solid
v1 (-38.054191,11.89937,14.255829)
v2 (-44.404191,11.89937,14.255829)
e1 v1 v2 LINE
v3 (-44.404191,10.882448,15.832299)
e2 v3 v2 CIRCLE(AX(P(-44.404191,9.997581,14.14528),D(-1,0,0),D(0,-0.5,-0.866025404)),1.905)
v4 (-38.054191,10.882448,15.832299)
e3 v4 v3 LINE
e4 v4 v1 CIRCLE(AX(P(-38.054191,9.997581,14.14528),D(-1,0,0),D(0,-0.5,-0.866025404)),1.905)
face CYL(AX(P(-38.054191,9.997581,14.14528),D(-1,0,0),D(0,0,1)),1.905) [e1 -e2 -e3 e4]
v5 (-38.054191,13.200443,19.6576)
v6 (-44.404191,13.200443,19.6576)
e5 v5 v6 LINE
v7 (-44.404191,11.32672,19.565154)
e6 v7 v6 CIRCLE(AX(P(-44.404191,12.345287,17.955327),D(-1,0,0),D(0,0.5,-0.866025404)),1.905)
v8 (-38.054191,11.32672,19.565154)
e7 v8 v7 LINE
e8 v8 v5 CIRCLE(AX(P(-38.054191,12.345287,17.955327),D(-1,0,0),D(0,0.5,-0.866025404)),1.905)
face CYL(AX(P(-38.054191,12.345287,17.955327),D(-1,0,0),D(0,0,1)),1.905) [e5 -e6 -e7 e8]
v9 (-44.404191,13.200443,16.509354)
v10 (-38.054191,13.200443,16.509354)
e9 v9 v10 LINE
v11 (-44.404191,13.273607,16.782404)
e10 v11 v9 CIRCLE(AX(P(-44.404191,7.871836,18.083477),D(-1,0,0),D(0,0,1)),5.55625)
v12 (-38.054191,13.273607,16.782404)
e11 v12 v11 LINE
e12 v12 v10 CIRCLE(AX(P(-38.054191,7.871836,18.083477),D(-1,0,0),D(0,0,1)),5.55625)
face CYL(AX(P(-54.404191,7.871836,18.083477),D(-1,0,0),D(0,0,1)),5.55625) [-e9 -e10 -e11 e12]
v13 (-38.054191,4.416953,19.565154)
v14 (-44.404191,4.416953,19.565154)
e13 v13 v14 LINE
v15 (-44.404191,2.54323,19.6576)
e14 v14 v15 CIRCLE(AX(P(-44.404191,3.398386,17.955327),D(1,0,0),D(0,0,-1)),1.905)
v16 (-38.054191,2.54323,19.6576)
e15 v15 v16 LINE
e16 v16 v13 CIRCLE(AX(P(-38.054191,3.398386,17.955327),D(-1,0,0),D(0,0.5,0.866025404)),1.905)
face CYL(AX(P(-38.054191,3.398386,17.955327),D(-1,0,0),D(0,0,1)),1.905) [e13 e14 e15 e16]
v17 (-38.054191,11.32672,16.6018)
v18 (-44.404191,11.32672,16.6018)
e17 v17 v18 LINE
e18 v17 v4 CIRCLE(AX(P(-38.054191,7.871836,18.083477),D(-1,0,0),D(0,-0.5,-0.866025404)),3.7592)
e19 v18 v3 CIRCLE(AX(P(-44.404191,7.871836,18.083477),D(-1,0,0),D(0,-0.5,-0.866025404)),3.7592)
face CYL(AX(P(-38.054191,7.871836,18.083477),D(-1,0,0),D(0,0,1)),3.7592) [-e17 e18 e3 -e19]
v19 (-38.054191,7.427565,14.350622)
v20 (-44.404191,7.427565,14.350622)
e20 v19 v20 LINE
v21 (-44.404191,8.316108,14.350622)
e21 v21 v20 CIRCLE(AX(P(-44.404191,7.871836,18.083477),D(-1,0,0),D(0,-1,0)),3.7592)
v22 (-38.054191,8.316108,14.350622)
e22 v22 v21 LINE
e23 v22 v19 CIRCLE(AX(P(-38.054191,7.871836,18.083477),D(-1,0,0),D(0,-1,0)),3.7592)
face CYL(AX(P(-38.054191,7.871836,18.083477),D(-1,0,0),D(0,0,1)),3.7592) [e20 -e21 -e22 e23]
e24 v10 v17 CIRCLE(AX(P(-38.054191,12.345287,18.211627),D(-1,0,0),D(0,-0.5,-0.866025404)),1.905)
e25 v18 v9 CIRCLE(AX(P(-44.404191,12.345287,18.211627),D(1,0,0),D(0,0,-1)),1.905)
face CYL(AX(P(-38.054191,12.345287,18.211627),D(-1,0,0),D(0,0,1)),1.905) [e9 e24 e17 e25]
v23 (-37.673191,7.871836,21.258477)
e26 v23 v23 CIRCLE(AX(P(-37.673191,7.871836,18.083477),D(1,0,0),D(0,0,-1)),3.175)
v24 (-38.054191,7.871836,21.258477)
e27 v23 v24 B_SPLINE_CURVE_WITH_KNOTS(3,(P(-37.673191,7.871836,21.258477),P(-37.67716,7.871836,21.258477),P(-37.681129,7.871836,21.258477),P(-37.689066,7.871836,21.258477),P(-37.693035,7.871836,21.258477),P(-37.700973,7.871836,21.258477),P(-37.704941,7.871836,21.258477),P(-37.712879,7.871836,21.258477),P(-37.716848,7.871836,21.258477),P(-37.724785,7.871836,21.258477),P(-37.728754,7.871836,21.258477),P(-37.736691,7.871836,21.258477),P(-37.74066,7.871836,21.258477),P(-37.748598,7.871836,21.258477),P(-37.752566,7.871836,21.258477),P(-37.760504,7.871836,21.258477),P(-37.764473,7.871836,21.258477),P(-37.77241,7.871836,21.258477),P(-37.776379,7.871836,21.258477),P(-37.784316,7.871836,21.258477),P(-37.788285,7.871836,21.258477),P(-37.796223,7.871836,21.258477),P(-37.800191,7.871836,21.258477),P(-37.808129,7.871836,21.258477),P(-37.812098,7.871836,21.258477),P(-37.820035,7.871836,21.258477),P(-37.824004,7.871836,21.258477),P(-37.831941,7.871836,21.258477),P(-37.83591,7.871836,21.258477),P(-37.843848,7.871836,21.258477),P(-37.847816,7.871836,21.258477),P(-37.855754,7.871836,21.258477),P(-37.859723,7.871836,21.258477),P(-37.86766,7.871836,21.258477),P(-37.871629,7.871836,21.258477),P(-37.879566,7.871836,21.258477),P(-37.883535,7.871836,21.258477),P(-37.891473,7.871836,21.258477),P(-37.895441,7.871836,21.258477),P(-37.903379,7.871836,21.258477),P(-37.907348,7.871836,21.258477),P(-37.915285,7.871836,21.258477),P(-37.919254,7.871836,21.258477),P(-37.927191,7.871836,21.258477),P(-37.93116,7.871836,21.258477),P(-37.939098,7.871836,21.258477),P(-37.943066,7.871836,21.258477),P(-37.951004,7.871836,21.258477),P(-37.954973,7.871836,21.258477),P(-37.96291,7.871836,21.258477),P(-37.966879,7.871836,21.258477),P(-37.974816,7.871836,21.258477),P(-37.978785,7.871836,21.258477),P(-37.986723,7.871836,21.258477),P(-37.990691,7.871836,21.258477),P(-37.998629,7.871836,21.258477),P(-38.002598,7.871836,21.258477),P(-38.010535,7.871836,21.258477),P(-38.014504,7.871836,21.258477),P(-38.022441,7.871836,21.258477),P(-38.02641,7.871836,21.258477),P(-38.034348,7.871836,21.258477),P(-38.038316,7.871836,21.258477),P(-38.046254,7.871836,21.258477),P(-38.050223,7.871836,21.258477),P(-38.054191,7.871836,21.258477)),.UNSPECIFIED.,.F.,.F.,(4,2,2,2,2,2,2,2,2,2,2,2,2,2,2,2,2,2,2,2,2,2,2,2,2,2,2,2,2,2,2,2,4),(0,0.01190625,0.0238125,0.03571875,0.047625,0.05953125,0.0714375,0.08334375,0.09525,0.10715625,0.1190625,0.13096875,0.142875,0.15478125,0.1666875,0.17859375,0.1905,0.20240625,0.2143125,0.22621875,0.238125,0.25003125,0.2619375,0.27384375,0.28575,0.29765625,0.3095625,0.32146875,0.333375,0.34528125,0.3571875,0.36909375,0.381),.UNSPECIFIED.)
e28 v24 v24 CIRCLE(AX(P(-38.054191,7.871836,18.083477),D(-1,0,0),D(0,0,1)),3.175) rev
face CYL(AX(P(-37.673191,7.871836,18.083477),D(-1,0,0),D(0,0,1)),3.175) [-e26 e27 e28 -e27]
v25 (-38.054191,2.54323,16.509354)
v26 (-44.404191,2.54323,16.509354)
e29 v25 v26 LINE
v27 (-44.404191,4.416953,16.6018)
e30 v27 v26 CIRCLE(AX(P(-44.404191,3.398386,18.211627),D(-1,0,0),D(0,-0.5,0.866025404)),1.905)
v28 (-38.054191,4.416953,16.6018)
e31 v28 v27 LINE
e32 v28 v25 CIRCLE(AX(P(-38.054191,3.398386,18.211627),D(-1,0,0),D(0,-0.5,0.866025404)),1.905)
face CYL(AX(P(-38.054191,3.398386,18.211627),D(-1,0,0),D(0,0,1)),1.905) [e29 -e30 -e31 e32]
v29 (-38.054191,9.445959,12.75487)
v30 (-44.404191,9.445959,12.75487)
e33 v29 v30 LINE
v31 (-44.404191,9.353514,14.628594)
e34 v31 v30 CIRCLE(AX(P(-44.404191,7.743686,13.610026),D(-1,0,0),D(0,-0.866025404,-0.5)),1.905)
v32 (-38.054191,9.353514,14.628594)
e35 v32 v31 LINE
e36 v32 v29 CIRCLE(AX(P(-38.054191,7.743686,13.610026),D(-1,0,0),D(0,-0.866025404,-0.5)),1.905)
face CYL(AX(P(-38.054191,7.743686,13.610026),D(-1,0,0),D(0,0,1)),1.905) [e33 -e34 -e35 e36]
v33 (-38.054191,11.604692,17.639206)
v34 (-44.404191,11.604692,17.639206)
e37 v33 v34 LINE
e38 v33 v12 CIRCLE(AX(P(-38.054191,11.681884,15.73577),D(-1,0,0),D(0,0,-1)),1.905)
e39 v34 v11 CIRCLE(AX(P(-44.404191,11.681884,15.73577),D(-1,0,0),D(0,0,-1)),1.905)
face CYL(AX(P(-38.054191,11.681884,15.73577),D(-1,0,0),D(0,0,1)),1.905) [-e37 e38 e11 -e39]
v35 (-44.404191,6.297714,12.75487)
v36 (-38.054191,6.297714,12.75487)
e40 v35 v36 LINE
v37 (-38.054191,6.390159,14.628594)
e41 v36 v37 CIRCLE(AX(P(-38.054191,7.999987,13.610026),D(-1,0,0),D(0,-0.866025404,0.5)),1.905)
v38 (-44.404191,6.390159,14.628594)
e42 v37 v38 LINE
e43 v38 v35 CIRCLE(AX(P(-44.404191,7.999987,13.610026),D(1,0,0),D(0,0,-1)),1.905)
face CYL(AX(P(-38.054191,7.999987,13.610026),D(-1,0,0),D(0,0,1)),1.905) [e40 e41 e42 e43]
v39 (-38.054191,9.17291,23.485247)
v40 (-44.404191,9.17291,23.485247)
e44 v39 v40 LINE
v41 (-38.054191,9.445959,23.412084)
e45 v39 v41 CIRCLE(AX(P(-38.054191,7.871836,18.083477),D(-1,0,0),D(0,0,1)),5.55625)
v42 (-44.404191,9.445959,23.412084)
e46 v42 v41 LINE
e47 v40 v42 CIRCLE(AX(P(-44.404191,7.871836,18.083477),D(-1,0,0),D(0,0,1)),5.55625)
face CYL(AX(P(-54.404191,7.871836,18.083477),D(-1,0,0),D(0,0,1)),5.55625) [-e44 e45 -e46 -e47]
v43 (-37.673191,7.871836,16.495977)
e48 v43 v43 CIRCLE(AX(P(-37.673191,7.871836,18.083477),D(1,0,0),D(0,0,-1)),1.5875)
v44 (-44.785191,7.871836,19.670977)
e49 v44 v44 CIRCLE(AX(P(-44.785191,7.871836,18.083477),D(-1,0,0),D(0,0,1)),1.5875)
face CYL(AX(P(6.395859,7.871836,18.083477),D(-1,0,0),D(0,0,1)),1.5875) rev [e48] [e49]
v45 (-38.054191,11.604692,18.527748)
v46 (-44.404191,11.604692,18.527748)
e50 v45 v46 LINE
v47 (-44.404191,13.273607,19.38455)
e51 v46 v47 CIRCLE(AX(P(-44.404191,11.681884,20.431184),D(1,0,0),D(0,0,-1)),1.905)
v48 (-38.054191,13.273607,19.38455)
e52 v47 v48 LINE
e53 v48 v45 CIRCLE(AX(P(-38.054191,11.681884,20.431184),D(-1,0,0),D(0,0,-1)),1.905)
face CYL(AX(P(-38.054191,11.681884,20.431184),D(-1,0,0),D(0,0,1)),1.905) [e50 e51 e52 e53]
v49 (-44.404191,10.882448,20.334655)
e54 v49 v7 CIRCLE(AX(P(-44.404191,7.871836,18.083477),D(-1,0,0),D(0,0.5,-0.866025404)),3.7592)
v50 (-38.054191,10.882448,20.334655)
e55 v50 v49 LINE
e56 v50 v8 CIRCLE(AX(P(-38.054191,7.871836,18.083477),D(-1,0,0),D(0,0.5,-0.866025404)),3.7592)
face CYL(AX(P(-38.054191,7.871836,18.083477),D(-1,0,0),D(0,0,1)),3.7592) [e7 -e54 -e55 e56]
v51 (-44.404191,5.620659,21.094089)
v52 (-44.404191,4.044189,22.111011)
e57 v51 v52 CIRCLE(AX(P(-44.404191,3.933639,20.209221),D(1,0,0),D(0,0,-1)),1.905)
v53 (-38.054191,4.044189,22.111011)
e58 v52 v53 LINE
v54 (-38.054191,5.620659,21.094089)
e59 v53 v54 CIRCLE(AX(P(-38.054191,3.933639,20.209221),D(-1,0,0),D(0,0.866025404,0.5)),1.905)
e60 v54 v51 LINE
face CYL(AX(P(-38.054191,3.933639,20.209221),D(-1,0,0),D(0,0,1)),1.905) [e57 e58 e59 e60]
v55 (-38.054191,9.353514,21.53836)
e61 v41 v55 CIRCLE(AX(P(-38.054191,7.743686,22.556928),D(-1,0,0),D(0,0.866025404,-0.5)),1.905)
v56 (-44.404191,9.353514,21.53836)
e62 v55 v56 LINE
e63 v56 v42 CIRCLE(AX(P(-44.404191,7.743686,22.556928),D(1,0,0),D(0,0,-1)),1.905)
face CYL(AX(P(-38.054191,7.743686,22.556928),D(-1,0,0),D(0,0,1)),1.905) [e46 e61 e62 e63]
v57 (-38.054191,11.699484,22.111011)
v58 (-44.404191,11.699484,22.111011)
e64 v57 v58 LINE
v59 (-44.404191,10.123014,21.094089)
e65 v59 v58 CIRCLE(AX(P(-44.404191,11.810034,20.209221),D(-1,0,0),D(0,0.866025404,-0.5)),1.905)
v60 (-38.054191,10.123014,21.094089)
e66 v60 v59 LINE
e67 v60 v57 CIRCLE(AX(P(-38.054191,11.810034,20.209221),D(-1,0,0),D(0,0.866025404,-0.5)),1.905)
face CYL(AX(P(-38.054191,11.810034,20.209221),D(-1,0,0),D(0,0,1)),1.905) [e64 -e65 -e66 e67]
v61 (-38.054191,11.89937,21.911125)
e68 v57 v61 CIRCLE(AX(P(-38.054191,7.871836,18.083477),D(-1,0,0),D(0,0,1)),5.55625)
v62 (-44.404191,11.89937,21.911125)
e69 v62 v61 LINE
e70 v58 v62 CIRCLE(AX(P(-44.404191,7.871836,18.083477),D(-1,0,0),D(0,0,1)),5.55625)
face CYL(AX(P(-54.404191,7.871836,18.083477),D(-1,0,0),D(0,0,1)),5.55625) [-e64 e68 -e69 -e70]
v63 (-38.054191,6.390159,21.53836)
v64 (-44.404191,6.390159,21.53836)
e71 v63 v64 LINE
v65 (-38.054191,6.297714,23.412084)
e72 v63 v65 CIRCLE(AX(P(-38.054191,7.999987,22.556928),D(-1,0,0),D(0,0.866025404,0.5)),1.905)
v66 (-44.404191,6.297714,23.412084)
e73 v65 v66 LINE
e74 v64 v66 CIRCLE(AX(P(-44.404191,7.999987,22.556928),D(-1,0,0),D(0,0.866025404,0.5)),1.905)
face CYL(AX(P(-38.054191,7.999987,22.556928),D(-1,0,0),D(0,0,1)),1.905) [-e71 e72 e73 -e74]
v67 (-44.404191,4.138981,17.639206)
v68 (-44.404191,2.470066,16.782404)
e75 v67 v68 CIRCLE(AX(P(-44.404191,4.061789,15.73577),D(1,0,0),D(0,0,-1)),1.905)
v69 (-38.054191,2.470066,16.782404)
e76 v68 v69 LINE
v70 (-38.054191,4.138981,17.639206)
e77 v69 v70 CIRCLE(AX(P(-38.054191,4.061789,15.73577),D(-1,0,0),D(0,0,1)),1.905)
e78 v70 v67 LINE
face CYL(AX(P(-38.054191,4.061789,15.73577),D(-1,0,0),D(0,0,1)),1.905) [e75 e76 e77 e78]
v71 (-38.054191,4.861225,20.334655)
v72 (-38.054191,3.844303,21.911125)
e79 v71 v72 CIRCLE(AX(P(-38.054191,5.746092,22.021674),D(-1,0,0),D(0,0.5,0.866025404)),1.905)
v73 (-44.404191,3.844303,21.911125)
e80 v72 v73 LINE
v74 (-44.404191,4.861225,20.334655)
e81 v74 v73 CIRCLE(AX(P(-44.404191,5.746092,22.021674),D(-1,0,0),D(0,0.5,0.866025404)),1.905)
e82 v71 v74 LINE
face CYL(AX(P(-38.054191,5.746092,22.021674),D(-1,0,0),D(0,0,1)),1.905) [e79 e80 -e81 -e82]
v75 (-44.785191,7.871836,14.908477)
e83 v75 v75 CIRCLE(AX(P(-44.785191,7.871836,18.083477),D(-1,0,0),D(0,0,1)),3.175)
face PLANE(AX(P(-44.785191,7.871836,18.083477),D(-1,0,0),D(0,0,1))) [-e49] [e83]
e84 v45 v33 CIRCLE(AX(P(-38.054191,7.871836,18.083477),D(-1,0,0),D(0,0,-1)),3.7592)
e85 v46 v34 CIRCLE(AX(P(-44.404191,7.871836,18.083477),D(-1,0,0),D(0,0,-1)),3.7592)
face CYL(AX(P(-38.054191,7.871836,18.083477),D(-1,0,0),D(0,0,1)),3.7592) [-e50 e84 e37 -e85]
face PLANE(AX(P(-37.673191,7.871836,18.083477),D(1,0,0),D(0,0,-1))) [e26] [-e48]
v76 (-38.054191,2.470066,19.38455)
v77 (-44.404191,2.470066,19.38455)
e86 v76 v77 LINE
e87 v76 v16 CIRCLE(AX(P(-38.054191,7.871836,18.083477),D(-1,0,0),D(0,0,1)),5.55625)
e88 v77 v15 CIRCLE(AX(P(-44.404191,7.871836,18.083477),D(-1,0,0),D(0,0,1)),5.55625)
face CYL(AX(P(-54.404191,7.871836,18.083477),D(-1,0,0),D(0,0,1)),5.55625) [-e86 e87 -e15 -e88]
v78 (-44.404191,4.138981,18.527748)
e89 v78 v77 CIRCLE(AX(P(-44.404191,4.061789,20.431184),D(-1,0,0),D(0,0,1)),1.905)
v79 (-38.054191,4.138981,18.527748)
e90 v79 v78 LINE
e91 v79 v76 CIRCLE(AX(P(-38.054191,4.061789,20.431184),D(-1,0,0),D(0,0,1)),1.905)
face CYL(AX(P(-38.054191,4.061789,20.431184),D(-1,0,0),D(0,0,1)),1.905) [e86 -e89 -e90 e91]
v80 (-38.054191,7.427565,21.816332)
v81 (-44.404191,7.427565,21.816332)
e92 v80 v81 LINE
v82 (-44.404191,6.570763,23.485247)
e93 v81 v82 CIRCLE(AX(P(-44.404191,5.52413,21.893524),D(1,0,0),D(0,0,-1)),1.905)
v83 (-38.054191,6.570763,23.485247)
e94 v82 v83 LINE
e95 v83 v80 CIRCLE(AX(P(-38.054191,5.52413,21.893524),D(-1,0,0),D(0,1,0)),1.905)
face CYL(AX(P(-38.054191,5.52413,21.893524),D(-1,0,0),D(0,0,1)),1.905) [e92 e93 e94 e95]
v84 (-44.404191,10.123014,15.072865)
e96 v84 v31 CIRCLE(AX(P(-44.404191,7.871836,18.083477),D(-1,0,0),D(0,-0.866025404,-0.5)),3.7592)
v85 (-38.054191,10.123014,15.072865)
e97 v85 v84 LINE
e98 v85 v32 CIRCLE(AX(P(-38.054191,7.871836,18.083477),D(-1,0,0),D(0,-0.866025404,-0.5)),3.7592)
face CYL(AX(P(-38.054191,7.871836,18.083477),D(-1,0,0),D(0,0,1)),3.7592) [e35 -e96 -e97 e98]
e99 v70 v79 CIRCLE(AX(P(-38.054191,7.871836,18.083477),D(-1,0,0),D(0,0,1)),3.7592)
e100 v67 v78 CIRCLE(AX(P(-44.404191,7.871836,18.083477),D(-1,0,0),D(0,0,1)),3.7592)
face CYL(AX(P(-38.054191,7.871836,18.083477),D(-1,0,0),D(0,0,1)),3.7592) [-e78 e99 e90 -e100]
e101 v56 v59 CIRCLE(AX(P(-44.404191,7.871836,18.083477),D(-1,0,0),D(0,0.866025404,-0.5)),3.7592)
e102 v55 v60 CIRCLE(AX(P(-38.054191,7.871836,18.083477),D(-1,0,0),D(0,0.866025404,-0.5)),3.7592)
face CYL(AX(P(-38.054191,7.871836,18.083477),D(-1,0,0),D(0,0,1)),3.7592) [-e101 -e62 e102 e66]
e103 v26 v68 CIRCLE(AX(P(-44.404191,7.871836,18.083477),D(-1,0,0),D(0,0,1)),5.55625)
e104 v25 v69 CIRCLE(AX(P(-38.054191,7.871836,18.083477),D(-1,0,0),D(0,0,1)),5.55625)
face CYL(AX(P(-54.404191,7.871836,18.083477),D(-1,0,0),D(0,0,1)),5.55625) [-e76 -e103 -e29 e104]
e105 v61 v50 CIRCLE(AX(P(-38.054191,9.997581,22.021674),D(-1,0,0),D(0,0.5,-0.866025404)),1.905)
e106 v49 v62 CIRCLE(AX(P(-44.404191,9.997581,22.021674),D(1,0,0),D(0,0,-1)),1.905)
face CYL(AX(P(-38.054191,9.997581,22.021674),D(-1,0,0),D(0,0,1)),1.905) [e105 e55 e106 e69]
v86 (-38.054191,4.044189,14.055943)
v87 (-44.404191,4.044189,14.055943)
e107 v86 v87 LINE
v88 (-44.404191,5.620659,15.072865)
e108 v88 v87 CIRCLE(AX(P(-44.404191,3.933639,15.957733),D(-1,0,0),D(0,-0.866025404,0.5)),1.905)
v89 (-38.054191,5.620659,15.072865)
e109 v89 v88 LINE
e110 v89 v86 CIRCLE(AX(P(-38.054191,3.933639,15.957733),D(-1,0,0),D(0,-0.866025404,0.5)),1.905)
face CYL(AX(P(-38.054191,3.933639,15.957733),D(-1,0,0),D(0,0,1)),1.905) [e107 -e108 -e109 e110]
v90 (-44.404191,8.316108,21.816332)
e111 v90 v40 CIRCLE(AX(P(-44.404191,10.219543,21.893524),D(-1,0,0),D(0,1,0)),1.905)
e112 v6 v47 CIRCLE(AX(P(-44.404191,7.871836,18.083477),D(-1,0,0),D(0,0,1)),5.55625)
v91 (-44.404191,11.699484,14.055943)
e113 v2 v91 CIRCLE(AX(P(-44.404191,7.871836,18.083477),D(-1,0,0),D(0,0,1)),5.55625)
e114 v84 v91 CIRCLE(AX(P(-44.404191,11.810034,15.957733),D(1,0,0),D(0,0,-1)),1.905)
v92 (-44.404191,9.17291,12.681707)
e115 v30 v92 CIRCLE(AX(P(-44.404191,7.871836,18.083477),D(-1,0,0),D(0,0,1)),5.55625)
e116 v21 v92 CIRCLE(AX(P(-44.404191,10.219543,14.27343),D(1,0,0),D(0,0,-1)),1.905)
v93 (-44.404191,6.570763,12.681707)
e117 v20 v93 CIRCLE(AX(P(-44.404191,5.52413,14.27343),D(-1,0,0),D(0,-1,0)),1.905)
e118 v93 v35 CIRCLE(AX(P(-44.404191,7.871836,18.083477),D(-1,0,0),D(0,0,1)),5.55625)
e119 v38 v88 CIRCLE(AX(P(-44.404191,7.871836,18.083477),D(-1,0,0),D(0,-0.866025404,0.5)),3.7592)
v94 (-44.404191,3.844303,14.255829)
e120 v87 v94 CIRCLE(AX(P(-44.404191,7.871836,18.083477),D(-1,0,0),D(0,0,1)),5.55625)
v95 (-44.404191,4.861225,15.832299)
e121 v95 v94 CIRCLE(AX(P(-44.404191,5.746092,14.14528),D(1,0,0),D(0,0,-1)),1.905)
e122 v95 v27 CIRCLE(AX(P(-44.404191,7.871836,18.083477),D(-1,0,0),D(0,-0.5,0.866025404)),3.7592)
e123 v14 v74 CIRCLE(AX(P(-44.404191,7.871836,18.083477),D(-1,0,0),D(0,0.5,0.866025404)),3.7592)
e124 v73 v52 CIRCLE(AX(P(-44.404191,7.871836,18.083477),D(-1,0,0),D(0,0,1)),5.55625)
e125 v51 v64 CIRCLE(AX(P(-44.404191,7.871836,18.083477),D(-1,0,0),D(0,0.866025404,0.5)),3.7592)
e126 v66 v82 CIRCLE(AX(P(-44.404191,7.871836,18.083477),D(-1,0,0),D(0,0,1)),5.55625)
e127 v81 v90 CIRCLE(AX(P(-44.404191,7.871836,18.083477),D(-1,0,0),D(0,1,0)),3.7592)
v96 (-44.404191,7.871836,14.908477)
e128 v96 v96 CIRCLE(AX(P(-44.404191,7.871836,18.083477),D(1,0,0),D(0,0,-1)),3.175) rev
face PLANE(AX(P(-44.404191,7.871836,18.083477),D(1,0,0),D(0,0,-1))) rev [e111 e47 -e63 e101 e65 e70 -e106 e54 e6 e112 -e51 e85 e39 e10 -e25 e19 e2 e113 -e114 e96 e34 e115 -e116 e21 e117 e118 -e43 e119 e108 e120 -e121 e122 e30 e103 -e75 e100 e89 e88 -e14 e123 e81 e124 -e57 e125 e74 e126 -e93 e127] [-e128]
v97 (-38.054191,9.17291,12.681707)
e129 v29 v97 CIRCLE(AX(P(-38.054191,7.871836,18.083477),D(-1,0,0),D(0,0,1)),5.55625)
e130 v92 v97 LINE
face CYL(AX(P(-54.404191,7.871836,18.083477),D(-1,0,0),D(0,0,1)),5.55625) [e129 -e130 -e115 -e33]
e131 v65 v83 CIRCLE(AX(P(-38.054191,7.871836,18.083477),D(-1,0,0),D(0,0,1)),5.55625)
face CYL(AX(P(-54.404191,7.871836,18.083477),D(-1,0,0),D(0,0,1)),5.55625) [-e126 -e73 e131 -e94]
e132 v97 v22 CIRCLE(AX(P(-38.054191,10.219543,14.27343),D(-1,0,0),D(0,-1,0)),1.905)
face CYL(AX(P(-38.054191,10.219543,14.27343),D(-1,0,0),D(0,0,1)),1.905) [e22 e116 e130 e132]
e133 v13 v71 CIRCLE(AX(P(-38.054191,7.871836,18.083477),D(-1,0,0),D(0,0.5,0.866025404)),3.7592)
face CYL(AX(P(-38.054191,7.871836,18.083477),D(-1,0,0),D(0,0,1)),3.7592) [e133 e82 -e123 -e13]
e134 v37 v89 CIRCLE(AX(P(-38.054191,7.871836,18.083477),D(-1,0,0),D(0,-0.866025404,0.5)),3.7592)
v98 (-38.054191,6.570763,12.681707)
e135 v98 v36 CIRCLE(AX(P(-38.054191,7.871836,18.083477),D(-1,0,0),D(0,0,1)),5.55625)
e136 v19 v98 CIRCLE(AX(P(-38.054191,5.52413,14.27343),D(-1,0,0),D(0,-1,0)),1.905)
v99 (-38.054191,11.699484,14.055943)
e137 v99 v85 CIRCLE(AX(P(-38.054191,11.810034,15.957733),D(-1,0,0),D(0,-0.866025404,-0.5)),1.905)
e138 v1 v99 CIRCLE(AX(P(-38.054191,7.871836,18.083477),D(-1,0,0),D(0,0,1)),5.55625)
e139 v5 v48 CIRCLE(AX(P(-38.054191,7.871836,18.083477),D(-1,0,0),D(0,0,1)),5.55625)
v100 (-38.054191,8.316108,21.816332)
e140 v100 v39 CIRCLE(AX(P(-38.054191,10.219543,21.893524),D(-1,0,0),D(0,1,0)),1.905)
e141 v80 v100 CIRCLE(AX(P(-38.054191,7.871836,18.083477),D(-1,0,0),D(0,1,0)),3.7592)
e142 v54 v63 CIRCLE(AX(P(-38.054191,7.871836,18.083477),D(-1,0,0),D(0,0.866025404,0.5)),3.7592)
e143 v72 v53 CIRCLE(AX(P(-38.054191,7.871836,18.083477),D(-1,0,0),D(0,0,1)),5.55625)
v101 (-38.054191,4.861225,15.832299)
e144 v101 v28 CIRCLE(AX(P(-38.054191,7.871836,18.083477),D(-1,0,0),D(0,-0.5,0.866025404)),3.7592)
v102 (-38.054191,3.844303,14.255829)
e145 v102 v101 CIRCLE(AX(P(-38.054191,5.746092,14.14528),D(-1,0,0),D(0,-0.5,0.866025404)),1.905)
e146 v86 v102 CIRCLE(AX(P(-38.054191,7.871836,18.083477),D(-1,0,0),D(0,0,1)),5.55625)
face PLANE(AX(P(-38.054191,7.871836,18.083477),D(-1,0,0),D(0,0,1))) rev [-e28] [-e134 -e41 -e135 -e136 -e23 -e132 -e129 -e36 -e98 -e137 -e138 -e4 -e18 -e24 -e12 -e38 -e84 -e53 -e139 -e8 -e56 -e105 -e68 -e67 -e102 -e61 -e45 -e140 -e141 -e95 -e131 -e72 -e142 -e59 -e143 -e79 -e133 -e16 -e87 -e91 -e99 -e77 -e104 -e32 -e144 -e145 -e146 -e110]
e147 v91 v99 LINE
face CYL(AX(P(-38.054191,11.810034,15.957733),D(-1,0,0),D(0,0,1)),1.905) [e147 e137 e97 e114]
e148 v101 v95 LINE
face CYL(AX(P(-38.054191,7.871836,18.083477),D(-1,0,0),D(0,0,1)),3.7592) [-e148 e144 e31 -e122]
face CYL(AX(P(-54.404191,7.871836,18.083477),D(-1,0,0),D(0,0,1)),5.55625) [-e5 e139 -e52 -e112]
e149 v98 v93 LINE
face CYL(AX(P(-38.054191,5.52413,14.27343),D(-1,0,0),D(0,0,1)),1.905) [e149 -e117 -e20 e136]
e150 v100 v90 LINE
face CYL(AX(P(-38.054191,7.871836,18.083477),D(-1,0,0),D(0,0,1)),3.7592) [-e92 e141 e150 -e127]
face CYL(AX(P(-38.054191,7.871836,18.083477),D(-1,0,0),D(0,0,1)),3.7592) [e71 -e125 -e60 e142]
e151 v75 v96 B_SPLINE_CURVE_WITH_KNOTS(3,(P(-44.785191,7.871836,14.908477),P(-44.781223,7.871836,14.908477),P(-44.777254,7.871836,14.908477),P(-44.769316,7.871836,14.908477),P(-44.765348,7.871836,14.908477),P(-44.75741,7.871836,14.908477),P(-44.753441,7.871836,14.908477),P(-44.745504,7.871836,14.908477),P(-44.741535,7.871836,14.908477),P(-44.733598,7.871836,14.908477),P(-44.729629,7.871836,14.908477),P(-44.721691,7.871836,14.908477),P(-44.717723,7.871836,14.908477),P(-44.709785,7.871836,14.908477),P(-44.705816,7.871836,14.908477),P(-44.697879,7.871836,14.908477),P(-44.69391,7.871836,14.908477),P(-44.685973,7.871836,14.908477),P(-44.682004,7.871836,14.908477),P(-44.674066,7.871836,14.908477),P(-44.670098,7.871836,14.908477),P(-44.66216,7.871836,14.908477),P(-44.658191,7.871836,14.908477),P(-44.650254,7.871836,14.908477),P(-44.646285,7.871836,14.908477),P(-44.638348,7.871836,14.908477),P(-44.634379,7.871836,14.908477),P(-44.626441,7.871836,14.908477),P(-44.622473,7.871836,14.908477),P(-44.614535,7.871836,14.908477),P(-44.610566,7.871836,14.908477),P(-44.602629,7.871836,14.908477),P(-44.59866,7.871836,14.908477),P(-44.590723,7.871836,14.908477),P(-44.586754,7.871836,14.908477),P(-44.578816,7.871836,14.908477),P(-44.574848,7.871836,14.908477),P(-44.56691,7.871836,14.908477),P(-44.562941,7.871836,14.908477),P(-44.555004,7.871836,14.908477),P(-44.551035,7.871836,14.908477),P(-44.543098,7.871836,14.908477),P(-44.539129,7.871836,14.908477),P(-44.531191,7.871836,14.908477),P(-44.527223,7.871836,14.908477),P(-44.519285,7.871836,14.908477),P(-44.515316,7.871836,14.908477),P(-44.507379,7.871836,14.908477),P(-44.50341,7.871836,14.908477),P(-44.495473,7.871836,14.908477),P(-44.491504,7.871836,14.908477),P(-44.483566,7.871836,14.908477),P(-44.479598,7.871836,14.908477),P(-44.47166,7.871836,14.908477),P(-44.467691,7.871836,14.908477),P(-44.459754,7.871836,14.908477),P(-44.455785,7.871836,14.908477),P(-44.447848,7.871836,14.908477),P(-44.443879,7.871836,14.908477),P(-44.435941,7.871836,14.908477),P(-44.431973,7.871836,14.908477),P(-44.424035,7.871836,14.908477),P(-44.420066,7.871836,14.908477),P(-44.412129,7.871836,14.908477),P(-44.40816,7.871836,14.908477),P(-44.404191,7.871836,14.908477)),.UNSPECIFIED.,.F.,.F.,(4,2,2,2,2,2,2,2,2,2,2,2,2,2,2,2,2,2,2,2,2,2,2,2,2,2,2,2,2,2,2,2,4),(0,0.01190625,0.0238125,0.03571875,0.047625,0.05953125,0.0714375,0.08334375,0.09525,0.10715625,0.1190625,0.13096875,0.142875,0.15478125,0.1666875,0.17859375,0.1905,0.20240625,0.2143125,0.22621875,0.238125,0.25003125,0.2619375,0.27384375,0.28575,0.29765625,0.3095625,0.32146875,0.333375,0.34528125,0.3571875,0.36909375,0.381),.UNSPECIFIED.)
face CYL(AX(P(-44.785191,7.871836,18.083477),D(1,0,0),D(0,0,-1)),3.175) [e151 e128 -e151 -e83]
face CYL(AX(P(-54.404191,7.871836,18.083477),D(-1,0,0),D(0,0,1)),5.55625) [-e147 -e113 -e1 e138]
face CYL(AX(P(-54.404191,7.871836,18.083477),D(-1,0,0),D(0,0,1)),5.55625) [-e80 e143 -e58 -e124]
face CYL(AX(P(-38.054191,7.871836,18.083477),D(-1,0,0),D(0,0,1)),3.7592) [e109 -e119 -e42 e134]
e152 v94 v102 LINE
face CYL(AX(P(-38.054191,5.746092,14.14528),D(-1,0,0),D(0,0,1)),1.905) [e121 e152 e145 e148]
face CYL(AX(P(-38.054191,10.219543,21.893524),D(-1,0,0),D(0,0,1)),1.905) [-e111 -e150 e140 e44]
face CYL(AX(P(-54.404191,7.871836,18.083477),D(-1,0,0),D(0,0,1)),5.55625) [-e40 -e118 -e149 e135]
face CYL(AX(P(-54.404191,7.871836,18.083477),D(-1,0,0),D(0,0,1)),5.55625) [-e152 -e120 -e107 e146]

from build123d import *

# Parameters (mm, degrees)
SPUR_START             = -44.404191422
SPUR_GEAR_AI_OUTLINE_R = 1.5875
SPUR_GEAR_AI_DEPTH     = 6.35
SKETCH1_R              = 3.175
SKETCH1_R_2            = 1.5875
BOSS_EXTRUDE1_DEPTH    = 0.381
BOSS_EXTRUDE2_START    = 0.381
SKETCH2_R              = 3.175
SKETCH2_R_2            = 1.5875
BOSS_EXTRUDE2_DEPTH    = 0.381


# Read off the part's stored shape, not the designer's step: spur gear_ai
with BuildPart() as part:
    # spur gear_ai outline → spur gear_ai (new body)
    with BuildSketch(Plane.YZ.offset(SPUR_START)):
        with BuildLine():
            ThreePointArc((11.6994841, 14.055943365), (11.800698547, 14.154615032), (11.899370214, 14.255829479))
            ThreePointArc((11.899370214, 14.255829479), (11.59841749, 15.177920223), (10.882448174, 15.832299182))
            ThreePointArc((10.882448174, 15.832299182), (11.127399192, 16.203877085), (11.326719587, 16.601799841))
            ThreePointArc((11.326719587, 16.601799841), (12.251413047, 16.308941704), (13.200443418, 16.509354372))
            ThreePointArc((13.200443418, 16.509354372), (13.238761866, 16.645413766), (13.273606813, 16.782403881))
            ThreePointArc((13.273606813, 16.782403881), (12.551928737, 17.430481528), (11.604691642, 17.639205672))
            ThreePointArc((11.604691642, 17.639205672), (11.631036494, 18.083477085), (11.604691642, 18.527748498))
            ThreePointArc((11.604691642, 18.527748498), (12.551928737, 18.736472642), (13.273606813, 19.384550289))
            ThreePointArc((13.273606813, 19.384550289), (13.238761866, 19.521540404), (13.200443418, 19.657599798))
            ThreePointArc((13.200443418, 19.657599798), (12.251413047, 19.858012466), (11.326719587, 19.565154329))
            ThreePointArc((11.326719587, 19.565154329), (11.127399192, 19.963077085), (10.882448174, 20.334654988))
            ThreePointArc((10.882448174, 20.334654988), (11.59841749, 20.989033947), (11.899370214, 21.911124691))
            ThreePointArc((11.899370214, 21.911124691), (11.800698547, 22.012339138), (11.6994841, 22.111010805))
            ThreePointArc((11.6994841, 22.111010805), (10.777393356, 21.810058081), (10.123014397, 21.094088765))
            ThreePointArc((10.123014397, 21.094088765), (9.751436494, 21.339039783), (9.353513738, 21.538360178))
            ThreePointArc((9.353513738, 21.538360178), (9.646371875, 22.463053638), (9.445959207, 23.412084009))
            ThreePointArc((9.445959207, 23.412084009), (9.309899813, 23.450402457), (9.172909698, 23.485247404))
            ThreePointArc((9.172909698, 23.485247404), (8.524832051, 22.763569327), (8.316107907, 21.816332232))
            ThreePointArc((8.316107907, 21.816332232), (7.871836494, 21.842677085), (7.427565081, 21.816332232))
            ThreePointArc((7.427565081, 21.816332232), (7.218840938, 22.763569328), (6.57076329, 23.485247404))
            ThreePointArc((6.57076329, 23.485247404), (6.433773175, 23.450402457), (6.297713781, 23.412084009))
            ThreePointArc((6.297713781, 23.412084009), (6.097301113, 22.463053638), (6.39015925, 21.538360178))
            ThreePointArc((6.39015925, 21.538360178), (5.992236494, 21.339039783), (5.620658591, 21.094088765))
            ThreePointArc((5.620658591, 21.094088765), (4.966279632, 21.810058081), (4.044188888, 22.111010805))
            ThreePointArc((4.044188888, 22.111010805), (3.942974441, 22.012339138), (3.844302774, 21.911124691))
            ThreePointArc((3.844302774, 21.911124691), (4.145255498, 20.989033947), (4.861224814, 20.334654988))
            ThreePointArc((4.861224814, 20.334654988), (4.616273796, 19.963077085), (4.416953401, 19.565154329))
            ThreePointArc((4.416953401, 19.565154329), (3.492259941, 19.858012466), (2.54322957, 19.657599798))
            ThreePointArc((2.54322957, 19.657599798), (2.504911122, 19.521540404), (2.470066175, 19.384550289))
            ThreePointArc((2.470066175, 19.384550289), (3.191744252, 18.736472642), (4.138981347, 18.527748498))
            ThreePointArc((4.138981347, 18.527748498), (4.112636494, 18.083477085), (4.138981347, 17.639205672))
            ThreePointArc((4.138981347, 17.639205672), (3.191744252, 17.430481528), (2.470066175, 16.782403881))
            ThreePointArc((2.470066175, 16.782403881), (2.504911122, 16.645413766), (2.54322957, 16.509354372))
            ThreePointArc((2.54322957, 16.509354372), (3.492259941, 16.308941704), (4.416953401, 16.601799841))
            ThreePointArc((4.416953401, 16.601799841), (4.616273796, 16.203877085), (4.861224814, 15.832299182))
            ThreePointArc((4.861224814, 15.832299182), (4.145255498, 15.177920223), (3.844302774, 14.255829479))
            ThreePointArc((3.844302774, 14.255829479), (3.942974441, 14.154615032), (4.044188888, 14.055943365))
            ThreePointArc((4.044188888, 14.055943365), (4.966279632, 14.356896089), (5.620658591, 15.072865405))
            ThreePointArc((5.620658591, 15.072865405), (5.992236494, 14.827914387), (6.39015925, 14.628593992))
            ThreePointArc((6.39015925, 14.628593992), (6.097301113, 13.703900532), (6.297713781, 12.754870161))
            ThreePointArc((6.297713781, 12.754870161), (6.433773175, 12.716551713), (6.57076329, 12.681706766))
            ThreePointArc((6.57076329, 12.681706766), (7.218840938, 13.403384842), (7.427565081, 14.350621938))
            ThreePointArc((7.427565081, 14.350621938), (7.871836494, 14.324277085), (8.316107907, 14.350621938))
            ThreePointArc((8.316107907, 14.350621938), (8.524832051, 13.403384843), (9.172909698, 12.681706766))
            ThreePointArc((9.172909698, 12.681706766), (9.309899813, 12.716551713), (9.445959207, 12.754870161))
            ThreePointArc((9.445959207, 12.754870161), (9.646371875, 13.703900532), (9.353513738, 14.628593992))
            ThreePointArc((9.353513738, 14.628593992), (9.751436494, 14.827914387), (10.123014397, 15.072865405))
            ThreePointArc((10.123014397, 15.072865405), (10.777393356, 14.356896089), (11.6994841, 14.055943365))
        make_face()
        with Locations((7.871836494, 18.083477085)):
            Circle(SPUR_GEAR_AI_OUTLINE_R, mode=Mode.SUBTRACT)
    extrude(amount=SPUR_GEAR_AI_DEPTH)

    # Sketch1 → Boss-Extrude1 (add)
    with BuildSketch(Plane(origin=(-38.054191422, 0, 0), x_dir=(0, 0, -1), z_dir=(1, 0, 0))):
        with Locations(Location((-18.083477085, 7.871836494, 0), (0, 0, 180))):
            Circle(SKETCH1_R)
        with Locations((-18.083477085, 7.871836494)):
            Circle(SKETCH1_R_2, mode=Mode.SUBTRACT)
    extrude(amount=BOSS_EXTRUDE1_DEPTH)

    # Sketch2 → Boss-Extrude2 (add)
    with BuildSketch(Plane.ZY.offset(44.404191422).offset(BOSS_EXTRUDE2_START)):
        with Locations((18.083477085, 7.871836494)):
            Circle(SKETCH2_R)
        with Locations((18.083477085, 7.871836494)):
            Circle(SKETCH2_R_2, mode=Mode.SUBTRACT)
    extrude(amount=-BOSS_EXTRUDE2_DEPTH)


solid = part.part
